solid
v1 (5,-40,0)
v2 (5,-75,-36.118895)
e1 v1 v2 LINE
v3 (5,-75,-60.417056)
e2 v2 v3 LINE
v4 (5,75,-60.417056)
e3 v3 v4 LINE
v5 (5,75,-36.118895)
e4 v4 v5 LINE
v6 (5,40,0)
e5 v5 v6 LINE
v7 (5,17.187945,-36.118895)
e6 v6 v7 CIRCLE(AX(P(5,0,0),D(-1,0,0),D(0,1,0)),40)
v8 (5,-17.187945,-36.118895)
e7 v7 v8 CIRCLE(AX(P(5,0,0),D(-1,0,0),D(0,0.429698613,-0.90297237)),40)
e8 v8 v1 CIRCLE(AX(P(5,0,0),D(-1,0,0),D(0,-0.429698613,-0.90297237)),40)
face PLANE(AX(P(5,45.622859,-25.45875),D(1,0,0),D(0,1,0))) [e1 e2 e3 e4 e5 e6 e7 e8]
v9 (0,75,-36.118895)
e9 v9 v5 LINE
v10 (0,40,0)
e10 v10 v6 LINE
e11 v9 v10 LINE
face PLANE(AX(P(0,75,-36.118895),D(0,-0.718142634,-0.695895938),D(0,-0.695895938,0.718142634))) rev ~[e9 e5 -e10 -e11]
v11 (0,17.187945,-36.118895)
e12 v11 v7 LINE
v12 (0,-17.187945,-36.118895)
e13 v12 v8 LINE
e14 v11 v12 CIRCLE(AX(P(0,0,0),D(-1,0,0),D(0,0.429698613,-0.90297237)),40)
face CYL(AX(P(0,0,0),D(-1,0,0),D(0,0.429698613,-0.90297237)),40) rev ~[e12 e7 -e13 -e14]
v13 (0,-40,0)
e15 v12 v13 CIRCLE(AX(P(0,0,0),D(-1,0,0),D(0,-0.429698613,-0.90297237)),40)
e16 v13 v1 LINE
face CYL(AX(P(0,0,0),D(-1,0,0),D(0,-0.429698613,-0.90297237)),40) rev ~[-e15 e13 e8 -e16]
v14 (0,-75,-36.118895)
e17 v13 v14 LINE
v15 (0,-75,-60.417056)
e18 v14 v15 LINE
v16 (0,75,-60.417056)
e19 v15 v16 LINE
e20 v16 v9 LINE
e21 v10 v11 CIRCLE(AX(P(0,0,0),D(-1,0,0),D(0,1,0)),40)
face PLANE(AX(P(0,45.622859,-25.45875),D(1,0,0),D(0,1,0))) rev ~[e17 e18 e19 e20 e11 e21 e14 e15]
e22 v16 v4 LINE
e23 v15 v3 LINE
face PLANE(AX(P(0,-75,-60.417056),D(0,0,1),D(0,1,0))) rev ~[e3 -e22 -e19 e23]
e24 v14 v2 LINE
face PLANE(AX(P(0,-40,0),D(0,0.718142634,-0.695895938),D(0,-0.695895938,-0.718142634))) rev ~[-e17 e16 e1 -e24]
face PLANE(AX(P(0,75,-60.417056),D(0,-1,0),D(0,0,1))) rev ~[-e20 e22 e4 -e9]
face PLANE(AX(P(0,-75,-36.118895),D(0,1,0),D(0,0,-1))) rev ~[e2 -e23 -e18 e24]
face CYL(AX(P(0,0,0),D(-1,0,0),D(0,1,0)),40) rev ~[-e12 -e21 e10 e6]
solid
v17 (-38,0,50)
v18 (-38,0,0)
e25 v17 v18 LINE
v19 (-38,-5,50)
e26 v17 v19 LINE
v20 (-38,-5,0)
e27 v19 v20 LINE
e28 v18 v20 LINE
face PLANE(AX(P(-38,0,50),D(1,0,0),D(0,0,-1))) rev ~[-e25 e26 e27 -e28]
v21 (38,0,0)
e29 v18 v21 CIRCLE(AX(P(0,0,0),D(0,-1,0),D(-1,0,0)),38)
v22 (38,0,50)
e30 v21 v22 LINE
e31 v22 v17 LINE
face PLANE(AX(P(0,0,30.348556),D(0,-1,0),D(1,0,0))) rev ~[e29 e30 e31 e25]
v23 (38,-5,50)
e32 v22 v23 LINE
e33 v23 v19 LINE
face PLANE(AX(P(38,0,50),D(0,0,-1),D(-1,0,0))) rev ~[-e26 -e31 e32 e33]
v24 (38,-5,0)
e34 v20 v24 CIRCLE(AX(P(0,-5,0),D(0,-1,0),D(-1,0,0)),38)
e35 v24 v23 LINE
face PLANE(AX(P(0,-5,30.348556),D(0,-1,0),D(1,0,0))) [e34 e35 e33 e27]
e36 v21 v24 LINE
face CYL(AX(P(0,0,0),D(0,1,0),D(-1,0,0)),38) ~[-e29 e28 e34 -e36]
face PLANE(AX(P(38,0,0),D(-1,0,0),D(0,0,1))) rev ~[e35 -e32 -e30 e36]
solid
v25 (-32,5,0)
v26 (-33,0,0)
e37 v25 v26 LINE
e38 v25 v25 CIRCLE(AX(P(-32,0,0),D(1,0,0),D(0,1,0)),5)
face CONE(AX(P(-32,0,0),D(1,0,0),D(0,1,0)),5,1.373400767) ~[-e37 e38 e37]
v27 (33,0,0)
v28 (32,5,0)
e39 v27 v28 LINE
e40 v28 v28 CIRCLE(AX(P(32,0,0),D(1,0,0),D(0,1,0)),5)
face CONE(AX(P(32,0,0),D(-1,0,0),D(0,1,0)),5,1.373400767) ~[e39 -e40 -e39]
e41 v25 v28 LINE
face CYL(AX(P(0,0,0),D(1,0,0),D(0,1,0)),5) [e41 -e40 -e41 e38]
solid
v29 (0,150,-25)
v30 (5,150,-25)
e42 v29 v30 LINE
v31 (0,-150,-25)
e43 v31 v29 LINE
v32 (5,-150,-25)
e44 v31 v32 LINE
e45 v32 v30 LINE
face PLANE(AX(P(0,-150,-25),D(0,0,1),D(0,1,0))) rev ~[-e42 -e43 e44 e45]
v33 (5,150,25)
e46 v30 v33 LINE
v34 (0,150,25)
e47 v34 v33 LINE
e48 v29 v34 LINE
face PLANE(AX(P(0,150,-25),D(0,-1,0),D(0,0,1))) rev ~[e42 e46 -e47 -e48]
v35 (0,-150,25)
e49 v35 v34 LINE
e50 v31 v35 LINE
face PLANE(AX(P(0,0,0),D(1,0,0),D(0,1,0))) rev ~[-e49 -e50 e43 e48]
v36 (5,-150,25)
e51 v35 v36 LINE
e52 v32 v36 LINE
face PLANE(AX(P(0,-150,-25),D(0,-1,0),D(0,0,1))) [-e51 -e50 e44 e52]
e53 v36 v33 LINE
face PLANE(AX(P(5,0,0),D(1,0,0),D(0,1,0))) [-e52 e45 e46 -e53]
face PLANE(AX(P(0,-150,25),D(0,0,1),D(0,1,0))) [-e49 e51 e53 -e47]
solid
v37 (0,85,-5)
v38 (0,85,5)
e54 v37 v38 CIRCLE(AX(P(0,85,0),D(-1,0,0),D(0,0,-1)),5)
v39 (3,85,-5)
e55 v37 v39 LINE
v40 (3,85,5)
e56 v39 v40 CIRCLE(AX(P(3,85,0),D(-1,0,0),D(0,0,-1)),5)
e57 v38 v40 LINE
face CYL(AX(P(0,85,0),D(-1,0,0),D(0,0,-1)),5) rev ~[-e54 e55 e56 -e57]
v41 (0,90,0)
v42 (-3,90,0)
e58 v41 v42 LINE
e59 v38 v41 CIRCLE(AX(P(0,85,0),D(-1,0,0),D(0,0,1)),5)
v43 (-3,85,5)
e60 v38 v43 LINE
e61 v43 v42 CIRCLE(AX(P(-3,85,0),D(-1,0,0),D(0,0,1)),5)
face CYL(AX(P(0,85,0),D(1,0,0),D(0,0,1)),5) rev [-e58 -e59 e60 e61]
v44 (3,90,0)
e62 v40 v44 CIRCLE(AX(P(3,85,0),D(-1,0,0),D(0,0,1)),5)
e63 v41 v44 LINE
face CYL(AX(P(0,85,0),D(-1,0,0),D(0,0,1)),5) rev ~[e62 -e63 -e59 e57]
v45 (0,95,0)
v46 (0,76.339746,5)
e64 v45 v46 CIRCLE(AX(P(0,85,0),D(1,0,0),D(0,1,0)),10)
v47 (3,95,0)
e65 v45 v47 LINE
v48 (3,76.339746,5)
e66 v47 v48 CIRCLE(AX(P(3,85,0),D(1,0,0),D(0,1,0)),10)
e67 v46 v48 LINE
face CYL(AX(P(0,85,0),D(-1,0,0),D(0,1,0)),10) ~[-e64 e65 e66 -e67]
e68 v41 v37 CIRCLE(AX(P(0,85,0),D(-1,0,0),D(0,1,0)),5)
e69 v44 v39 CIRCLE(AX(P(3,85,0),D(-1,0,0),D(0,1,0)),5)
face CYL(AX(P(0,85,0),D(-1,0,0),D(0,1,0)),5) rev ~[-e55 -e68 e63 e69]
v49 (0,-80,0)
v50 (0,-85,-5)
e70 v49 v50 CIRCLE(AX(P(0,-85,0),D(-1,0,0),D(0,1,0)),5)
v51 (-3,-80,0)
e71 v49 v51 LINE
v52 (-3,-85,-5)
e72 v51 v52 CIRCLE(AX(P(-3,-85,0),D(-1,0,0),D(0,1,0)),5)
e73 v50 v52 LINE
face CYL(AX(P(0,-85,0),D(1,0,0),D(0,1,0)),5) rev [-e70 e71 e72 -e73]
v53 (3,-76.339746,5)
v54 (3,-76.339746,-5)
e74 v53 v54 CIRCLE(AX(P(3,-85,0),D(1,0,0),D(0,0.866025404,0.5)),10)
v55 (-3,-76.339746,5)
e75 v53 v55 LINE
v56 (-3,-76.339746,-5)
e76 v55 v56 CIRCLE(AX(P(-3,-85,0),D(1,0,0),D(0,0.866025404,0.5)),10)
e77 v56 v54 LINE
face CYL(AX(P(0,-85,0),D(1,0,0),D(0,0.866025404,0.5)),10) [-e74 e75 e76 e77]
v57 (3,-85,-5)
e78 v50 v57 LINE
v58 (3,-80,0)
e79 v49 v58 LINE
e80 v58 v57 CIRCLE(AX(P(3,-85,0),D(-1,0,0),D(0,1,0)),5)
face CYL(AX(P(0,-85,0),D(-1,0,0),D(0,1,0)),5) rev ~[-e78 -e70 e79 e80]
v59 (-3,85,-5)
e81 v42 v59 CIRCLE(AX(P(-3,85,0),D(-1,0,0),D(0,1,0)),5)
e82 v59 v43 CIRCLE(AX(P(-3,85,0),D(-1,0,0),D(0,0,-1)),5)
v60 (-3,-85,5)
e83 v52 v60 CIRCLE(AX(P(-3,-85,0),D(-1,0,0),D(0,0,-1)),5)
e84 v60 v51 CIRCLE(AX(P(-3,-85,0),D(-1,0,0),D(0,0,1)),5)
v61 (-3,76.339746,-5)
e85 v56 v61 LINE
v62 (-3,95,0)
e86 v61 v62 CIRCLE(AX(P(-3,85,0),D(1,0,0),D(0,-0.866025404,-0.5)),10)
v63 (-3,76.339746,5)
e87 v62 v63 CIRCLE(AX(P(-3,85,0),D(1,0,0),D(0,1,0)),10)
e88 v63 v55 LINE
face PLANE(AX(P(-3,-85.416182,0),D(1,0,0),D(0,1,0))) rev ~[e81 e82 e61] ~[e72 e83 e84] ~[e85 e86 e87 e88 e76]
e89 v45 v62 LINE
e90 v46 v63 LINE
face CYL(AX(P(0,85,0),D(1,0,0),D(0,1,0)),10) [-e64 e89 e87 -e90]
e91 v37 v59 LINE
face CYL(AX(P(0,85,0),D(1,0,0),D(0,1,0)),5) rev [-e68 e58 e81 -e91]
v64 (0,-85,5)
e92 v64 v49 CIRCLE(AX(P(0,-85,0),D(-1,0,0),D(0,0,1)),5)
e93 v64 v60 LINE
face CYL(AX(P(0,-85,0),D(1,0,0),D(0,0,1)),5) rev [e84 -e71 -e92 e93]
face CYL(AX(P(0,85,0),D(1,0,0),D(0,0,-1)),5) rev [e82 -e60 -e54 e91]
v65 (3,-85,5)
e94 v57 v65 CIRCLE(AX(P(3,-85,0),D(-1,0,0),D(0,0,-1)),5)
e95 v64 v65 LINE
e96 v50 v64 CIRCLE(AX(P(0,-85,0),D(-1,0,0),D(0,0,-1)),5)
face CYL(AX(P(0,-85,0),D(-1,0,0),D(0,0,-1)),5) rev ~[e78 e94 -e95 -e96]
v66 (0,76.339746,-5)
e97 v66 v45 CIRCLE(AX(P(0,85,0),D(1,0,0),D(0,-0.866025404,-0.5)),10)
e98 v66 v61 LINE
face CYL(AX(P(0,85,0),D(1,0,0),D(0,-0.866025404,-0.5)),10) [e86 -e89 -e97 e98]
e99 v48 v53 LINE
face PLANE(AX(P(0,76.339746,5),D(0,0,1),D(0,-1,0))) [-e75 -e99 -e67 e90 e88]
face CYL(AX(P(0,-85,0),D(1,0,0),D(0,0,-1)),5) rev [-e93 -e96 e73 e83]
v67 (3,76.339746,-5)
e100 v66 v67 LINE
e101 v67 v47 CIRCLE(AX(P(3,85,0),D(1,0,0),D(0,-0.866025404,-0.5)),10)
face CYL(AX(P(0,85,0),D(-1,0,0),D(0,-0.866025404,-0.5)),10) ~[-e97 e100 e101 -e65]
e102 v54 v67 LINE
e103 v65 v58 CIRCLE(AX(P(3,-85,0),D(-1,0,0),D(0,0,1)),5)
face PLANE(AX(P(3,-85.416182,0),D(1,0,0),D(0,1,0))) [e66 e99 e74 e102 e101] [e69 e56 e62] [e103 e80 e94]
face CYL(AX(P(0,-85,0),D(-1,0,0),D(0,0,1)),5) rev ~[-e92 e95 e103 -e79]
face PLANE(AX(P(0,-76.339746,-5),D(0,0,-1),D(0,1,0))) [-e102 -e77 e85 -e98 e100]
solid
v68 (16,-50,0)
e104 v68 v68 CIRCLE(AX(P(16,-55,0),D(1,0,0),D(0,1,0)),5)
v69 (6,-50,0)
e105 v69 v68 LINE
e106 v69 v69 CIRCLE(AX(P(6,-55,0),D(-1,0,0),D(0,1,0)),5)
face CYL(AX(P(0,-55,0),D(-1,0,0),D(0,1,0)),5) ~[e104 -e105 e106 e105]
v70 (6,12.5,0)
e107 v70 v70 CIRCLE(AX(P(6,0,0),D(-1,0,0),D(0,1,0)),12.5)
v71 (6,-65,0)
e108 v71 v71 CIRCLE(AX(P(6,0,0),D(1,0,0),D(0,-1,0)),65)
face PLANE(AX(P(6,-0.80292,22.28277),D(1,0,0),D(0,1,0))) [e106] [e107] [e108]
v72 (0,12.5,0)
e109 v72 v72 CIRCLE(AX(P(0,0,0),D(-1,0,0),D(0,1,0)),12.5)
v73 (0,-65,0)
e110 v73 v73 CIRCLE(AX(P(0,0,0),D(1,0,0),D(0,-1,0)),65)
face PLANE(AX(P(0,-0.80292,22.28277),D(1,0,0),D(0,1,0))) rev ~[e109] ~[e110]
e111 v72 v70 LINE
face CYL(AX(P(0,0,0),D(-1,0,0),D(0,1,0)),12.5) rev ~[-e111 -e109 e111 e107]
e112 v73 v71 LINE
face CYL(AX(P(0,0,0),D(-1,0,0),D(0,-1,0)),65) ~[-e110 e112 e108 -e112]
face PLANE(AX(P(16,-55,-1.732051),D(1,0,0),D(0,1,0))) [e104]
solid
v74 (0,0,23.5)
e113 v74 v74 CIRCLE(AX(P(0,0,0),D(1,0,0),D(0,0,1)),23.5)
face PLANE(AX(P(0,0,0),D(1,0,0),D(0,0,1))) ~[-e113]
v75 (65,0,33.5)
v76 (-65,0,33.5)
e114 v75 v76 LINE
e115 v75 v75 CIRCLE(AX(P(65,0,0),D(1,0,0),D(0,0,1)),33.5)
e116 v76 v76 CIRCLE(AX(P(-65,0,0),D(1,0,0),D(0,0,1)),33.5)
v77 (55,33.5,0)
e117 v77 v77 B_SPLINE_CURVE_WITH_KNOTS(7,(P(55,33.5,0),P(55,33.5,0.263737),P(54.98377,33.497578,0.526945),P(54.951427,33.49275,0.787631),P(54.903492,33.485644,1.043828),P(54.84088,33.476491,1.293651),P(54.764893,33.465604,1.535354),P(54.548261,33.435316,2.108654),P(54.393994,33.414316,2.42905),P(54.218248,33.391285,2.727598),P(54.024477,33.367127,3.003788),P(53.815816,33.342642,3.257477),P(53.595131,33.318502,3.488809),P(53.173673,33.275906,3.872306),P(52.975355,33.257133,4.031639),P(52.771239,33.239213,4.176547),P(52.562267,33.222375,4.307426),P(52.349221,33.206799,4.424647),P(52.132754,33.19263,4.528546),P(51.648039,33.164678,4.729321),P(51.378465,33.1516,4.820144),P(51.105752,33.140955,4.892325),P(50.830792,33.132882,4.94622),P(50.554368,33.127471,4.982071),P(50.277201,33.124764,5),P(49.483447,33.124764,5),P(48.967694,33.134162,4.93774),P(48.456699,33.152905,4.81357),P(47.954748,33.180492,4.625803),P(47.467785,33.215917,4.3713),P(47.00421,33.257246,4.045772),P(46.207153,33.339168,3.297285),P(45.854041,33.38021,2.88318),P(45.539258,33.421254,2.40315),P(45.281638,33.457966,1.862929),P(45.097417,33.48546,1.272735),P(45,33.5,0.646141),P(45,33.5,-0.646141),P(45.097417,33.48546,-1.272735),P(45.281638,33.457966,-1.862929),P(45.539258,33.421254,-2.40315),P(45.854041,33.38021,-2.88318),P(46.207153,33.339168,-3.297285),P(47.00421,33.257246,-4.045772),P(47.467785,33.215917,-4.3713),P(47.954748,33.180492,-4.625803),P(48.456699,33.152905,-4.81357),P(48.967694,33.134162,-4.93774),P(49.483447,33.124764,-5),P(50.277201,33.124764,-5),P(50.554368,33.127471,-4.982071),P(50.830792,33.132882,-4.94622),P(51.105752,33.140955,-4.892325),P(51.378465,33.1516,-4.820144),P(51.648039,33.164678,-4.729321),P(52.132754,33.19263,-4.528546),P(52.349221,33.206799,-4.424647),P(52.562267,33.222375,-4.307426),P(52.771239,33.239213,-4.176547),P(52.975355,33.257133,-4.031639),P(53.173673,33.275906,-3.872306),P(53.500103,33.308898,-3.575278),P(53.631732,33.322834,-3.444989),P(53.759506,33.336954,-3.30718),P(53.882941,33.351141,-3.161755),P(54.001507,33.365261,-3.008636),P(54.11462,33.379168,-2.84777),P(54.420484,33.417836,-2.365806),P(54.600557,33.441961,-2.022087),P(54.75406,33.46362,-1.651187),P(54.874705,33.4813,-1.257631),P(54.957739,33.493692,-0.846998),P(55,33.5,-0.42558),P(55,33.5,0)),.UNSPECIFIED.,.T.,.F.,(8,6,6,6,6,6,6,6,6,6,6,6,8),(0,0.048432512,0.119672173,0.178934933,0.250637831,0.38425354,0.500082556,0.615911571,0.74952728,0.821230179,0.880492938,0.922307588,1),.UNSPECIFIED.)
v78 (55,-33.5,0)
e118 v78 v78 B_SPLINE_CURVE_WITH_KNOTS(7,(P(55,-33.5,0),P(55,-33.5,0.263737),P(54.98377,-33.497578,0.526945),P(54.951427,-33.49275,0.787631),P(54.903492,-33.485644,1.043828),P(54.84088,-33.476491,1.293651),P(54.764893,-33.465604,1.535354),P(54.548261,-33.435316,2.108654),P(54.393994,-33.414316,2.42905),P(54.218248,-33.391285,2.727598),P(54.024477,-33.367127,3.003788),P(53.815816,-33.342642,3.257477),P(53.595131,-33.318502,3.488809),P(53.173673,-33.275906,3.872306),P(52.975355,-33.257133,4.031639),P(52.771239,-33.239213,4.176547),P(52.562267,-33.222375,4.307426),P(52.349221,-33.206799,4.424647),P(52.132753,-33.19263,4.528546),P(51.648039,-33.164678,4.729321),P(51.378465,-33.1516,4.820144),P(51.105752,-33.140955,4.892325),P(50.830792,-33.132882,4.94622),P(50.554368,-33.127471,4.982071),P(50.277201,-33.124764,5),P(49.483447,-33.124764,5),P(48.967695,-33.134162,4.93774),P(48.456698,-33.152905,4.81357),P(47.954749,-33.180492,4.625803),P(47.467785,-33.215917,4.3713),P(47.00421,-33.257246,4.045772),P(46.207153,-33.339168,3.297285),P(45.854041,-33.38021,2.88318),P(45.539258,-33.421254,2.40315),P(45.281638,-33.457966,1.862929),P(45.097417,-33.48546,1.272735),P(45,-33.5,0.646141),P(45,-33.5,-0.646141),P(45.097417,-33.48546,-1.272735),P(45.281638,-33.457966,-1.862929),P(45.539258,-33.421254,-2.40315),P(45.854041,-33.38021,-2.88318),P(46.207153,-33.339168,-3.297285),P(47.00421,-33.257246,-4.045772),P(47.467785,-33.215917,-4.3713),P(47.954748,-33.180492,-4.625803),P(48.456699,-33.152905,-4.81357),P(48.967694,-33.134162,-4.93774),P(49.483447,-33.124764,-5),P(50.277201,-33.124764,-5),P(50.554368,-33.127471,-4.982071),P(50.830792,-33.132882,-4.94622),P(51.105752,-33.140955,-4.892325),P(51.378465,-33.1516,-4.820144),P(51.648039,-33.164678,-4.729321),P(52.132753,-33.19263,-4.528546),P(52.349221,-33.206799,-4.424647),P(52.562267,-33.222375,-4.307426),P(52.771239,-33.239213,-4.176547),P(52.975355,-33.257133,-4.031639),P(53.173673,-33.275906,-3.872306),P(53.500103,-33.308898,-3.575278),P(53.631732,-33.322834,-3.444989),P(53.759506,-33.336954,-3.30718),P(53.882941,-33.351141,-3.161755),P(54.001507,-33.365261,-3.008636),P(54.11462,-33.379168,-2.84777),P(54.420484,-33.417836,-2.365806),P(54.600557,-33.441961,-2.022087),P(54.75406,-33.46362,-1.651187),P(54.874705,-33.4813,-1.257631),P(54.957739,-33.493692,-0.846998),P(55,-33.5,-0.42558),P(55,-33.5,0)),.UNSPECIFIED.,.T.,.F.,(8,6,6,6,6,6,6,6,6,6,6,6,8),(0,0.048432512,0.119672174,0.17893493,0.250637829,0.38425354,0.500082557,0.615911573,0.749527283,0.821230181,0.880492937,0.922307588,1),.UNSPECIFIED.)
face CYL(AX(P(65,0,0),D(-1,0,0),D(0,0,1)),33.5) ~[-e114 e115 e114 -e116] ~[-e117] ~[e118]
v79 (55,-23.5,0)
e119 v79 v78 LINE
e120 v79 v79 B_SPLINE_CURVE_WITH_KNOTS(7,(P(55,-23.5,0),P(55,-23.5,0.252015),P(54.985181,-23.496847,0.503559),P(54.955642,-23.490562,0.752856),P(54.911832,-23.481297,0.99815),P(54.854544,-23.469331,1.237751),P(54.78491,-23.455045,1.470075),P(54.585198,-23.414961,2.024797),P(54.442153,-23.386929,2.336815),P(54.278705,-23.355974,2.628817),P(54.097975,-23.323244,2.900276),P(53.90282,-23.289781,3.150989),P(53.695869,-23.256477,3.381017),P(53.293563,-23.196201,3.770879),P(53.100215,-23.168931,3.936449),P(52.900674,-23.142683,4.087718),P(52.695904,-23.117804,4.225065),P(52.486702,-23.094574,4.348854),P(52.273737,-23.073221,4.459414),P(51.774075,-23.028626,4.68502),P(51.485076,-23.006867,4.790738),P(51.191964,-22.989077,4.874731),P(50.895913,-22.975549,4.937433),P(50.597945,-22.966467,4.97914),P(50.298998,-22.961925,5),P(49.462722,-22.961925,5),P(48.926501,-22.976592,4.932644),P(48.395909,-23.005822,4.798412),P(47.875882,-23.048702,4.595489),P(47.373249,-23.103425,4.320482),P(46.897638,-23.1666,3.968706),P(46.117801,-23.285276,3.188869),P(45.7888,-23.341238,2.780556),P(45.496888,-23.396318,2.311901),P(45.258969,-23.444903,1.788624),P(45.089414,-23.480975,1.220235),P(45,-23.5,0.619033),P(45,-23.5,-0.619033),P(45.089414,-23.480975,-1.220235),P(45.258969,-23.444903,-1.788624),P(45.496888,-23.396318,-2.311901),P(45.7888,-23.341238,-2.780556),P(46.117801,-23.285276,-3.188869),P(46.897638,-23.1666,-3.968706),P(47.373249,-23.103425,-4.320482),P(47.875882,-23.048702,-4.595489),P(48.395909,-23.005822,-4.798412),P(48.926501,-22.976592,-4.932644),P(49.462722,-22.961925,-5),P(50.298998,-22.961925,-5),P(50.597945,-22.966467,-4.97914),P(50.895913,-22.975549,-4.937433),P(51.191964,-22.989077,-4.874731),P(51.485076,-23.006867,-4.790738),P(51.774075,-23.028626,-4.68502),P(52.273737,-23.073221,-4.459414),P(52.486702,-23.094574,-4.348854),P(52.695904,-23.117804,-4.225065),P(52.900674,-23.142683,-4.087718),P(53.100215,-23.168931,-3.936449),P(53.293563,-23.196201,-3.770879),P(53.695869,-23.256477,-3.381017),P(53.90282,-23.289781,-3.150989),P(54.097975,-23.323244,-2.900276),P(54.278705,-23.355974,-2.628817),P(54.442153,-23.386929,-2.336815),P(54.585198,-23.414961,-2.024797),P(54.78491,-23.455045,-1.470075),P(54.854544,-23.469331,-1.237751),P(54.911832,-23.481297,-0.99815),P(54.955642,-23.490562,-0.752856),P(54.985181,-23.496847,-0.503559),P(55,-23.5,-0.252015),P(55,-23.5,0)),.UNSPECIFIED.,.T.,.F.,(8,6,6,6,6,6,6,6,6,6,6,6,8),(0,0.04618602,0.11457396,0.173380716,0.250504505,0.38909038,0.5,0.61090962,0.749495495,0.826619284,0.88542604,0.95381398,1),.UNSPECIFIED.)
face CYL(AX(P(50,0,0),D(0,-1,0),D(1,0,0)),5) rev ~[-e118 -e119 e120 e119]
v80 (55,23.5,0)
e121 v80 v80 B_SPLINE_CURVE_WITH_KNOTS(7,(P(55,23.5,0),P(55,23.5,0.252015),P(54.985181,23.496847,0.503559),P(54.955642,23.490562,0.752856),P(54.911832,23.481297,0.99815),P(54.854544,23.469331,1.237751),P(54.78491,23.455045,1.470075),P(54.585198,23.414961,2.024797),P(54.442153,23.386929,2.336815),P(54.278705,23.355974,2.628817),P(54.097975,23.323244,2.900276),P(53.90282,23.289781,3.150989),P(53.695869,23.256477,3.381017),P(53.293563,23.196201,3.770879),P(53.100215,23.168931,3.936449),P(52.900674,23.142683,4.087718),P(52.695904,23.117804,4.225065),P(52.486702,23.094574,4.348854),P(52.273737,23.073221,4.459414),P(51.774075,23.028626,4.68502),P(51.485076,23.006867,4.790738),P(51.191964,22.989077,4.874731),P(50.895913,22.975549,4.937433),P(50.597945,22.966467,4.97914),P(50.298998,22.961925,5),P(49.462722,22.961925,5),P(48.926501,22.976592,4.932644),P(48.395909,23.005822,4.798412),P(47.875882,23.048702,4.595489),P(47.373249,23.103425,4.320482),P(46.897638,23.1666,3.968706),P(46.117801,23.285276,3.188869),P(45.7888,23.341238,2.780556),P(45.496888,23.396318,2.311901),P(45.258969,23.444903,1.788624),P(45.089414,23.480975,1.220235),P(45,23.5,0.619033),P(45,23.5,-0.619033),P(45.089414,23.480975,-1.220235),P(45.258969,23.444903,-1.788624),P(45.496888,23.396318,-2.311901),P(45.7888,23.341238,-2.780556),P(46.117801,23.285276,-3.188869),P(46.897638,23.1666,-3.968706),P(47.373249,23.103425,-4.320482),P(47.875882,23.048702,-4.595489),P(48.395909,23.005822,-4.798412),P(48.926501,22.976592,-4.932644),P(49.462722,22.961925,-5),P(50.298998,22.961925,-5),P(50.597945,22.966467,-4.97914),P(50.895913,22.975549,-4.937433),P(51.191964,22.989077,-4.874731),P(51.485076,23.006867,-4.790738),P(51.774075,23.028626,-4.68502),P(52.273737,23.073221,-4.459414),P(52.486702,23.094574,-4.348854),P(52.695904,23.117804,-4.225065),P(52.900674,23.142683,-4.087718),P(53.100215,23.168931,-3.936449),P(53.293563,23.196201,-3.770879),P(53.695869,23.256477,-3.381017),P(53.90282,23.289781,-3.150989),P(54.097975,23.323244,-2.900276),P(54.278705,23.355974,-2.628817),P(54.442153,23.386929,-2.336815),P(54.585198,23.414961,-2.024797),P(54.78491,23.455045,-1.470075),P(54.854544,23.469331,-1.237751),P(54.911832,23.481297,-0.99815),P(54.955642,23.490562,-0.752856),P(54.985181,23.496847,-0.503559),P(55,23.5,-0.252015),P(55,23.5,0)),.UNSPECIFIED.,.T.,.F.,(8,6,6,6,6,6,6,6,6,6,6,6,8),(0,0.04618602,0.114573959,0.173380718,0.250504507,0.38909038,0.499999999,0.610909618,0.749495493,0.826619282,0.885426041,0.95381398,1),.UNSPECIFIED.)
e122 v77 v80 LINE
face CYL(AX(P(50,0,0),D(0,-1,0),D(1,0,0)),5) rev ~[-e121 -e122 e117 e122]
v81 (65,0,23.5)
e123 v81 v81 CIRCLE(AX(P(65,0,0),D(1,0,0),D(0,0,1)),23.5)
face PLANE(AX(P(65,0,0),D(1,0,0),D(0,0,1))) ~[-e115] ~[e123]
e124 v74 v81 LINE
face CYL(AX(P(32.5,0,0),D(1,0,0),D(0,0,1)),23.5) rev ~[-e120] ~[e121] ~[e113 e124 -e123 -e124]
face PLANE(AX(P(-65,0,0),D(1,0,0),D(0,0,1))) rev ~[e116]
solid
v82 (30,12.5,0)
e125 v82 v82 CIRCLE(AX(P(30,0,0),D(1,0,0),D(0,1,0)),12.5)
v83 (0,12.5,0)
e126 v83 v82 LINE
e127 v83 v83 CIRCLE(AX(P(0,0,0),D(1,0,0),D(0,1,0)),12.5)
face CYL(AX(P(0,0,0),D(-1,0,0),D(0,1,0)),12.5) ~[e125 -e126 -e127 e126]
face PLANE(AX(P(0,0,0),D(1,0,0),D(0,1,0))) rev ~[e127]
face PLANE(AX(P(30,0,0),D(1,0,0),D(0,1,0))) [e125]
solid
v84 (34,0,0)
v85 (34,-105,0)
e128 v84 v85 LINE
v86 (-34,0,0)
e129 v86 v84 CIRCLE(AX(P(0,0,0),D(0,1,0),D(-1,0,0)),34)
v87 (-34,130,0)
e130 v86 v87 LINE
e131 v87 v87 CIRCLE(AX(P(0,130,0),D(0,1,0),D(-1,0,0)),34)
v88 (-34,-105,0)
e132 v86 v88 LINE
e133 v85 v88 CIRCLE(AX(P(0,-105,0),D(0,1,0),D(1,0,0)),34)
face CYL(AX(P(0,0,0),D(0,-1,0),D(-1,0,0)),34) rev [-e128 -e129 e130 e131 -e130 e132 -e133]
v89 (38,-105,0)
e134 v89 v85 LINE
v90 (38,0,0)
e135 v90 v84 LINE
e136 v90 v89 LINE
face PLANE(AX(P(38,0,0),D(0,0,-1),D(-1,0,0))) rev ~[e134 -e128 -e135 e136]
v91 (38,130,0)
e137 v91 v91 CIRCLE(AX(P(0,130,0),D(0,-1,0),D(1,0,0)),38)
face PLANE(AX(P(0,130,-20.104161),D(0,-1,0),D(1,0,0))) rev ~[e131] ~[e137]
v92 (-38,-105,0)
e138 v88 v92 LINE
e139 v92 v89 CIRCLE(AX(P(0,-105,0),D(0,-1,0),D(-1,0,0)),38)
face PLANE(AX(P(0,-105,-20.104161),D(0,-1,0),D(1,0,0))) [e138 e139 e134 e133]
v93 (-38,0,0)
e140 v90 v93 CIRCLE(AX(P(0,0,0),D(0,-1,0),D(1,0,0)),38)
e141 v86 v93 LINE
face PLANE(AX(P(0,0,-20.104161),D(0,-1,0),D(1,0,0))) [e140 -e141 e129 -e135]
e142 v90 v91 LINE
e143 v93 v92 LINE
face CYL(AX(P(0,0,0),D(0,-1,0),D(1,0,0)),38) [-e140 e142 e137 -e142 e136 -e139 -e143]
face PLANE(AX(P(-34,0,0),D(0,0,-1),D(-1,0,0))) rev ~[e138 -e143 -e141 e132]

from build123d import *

# Parameters (mm, degrees)
F1_DEPTH  = 105
F2_DEPTH  = 130
F4_DEPTH  = 5
F5_W      = 65
F5_H      = 10
F7_DEPTH  = 34
F9_DEPTH  = 6
F10_DEPTH = 16
F11_R     = 5
F12_DEPTH = 33
F13_SIZE2 = 1
F13_SIZE  = 5
F14_SIZE2 = 5
F14_SIZE  = 1
F16_DEPTH = 3
F17_R     = 12.5
F18_DEPTH = 30
F19_W     = 300
F19_H     = 50
F20_DEPTH = 5
F22_DEPTH = 5


# Not quite as in the source:
# - a feature names something its author has since deleted; it is built from what else it names


with BuildPart() as f1:
    # F0 (on Front) → F1 (new body)
    with BuildSketch(Plane.XZ):
        with BuildLine():
            Line((38, 0), (34, 0))
            ThreePointArc((34, 0), (0, -34), (-34, 0))
            Line((-34, 0), (-38, 0))
            ThreePointArc((-38, 0), (0, -38), (38, 0))
        make_face()
    extrude(amount=F1_DEPTH)

    # F0 (on Front) → F2 (join)
    with BuildSketch(Plane.XZ):
        with BuildLine():
            Line((38, 0), (34, 0))
            ThreePointArc((34, 0), (0, -34), (-34, 0))
            Line((-34, 0), (-38, 0))
            ThreePointArc((-38, 0), (0, -38), (38, 0))
        make_face()
        with BuildLine():
            ThreePointArc((-34, 0), (0, 34), (34, 0))
            Line((34, 0), (38, 0))
            ThreePointArc((38, 0), (0, 38), (-38, 0))
            Line((-38, 0), (-34, 0))
        make_face()
    extrude(amount=-F2_DEPTH)


with BuildPart() as f4:
    # F3 (on Front) → F4 (new body)
    with BuildSketch(Plane.XZ):
        with BuildLine():
            ThreePointArc((-38, 0), (0, 38), (38, 0))
            Line((38, 0), (38, 50))
            Line((38, 50), (-38, 50))
            Line((-38, 50), (-38, 0))
        make_face()
        with BuildLine():
            ThreePointArc((-38, 0), (0, -38), (38, 0))
            Line((38, 0), (-38, 0))
        make_face()
        with BuildLine():
            Line((-38, 0), (38, 0))
            ThreePointArc((38, 0), (0, 38), (-38, 0))
        make_face()
    extrude(amount=F4_DEPTH)


with BuildPart() as f6:
    # F5 (on Front) → F6 (revolve)
    with BuildSketch(Plane.XZ):
        with Locations((32.5, 28.5)):
            Rectangle(F5_W, F5_H)
        Polygon((0, 23.5), (0, 33.5), (-65, 33.5), (-65, 0), (0, 0), align=None)
    revolve(axis=Axis((0, 0, 0), (1, 0, 0)))

    # F5 (on Front) → F7 (cut, symmetric)
    with BuildSketch(Plane.XZ):
        with BuildLine():
            ThreePointArc((45, 0), (50, -5), (55, 0))
            Line((55, 0), (45, 0))
        make_face()
        with BuildLine():
            Line((45, 0), (55, 0))
            ThreePointArc((55, 0), (50, 5), (45, 0))
        make_face()
    extrude(amount=F7_DEPTH, both=True, mode=Mode.SUBTRACT)


with BuildPart() as f9:
    # F8 (on Right) → F9 (new body)
    with BuildSketch(Plane.YZ):
        with BuildLine():
            Line((12.5, 0), (65, 0))
            ThreePointArc((65, 0), (0, 65), (-65, 0))
            Line((-65, 0), (-60, 0))
            ThreePointArc((-60, 0), (-55, 5), (-50, 0))
            Line((-50, 0), (-12.5, 0))
            ThreePointArc((-12.5, 0), (0, 12.5), (12.5, 0))
        make_face()
        with BuildLine():
            ThreePointArc((-65, 0), (0, -65), (65, 0))
            Line((65, 0), (12.5, 0))
            ThreePointArc((12.5, 0), (0, -12.5), (-12.5, 0))
            Line((-12.5, 0), (-50, 0))
            ThreePointArc((-50, 0), (-55, -5), (-60, 0))
            Line((-60, 0), (-65, 0))
        make_face()
    extrude(amount=F9_DEPTH)

    # F8 (on Right) → F10 (join)
    with BuildSketch(Plane.YZ):
        with BuildLine():
            Line((-50, 0), (-60, 0))
            ThreePointArc((-60, 0), (-55, -5), (-50, 0))
        make_face()
        with BuildLine():
            ThreePointArc((-50, 0), (-55, 5), (-60, 0))
            Line((-60, 0), (-50, 0))
        make_face()
    extrude(amount=F10_DEPTH)


with BuildPart() as f12:
    # F11 (on Right) → F12 (new body, symmetric)
    with BuildSketch(Plane.YZ):
        Circle(F11_R)
    extrude(amount=F12_DEPTH, both=True)

    # F13
    f13_edges = [f12.edges().sort_by_distance(p)[0] for p in [
        (33, -5, 0),
    ]]
    f13_side = f12.faces().sort_by_distance((33, 0, 0))[0]
    chamfer(f13_edges, length=F13_SIZE, length2=F13_SIZE2, reference=f13_side)

    # F14
    f14_edges = [f12.edges().sort_by_distance(p)[0] for p in [
        (-33, -5, 0),
    ]]
    chamfer(f14_edges, length=F14_SIZE, length2=F14_SIZE2)


with BuildPart() as f16:
    # F15 (on Right) → F16 (new body, symmetric)
    with BuildSketch(Plane.YZ):
        with BuildLine():
            Line((-85, 5), (-76.3397459622, 5))
            ThreePointArc((-76.3397459622, 5), (-95, 0), (-76.3397459622, -5))
            Line((-76.3397459622, -5), (-85, -5))
            ThreePointArc((-85, -5), (-90, 0), (-85, 5))
        make_face()
        with BuildLine():
            ThreePointArc((-75, 0), (-75.3407417371, 2.588190451), (-76.3397459622, 5))
            Line((-76.3397459622, 5), (-85, 5))
            ThreePointArc((-85, 5), (-81.4644660941, 3.5355339059), (-80, 0))
            ThreePointArc((-80, 0), (-81.4644660941, -3.5355339059), (-85, -5))
            Line((-85, -5), (-76.3397459622, -5))
            ThreePointArc((-76.3397459622, -5), (-75.3407417371, -2.588190451), (-75, 0))
        make_face()
        with BuildLine():
            ThreePointArc((76.3397459622, -5), (75, 0), (76.3397459622, 5))
            Line((76.3397459622, 5), (-76.3397459622, 5))
            ThreePointArc((-76.3397459622, 5), (-75.3407417371, 2.588190451), (-75, 0))
            ThreePointArc((-75, 0), (-75.3407417371, -2.588190451), (-76.3397459622, -5))
            Line((-76.3397459622, -5), (76.3397459622, -5))
        make_face()
        with BuildLine():
            ThreePointArc((85, -5), (80, 0), (85, 5))
            Line((85, 5), (76.3397459622, 5))
            ThreePointArc((76.3397459622, 5), (75, 0), (76.3397459622, -5))
            Line((76.3397459622, -5), (85, -5))
        make_face()
        with BuildLine():
            Line((76.3397459622, 5), (85, 5))
            ThreePointArc((85, 5), (88.5355339059, 3.5355339059), (90, 0))
            ThreePointArc((90, 0), (88.5355339059, -3.5355339059), (85, -5))
            Line((85, -5), (76.3397459622, -5))
            ThreePointArc((76.3397459622, -5), (87.588190451, -9.6592582629), (95, 0))
            ThreePointArc((95, 0), (87.588190451, 9.6592582629), (76.3397459622, 5))
        make_face()
    extrude(amount=F16_DEPTH, both=True)


with BuildPart() as f18:
    # F17 (on Right) → F18 (new body)
    with BuildSketch(Plane.YZ):
        Circle(F17_R)
    extrude(amount=F18_DEPTH)


with BuildPart() as f20:
    # F19 (on Right) → F20 (new body)
    with BuildSketch(Plane.YZ):
        Rectangle(F19_W, F19_H)
    extrude(amount=F20_DEPTH)


with BuildPart() as f22:
    # F21 (on Right) → F22 (new body)
    with BuildSketch(Plane.YZ):
        with BuildLine():
            Line((75, -36.1188948154), (40, 0))
            ThreePointArc((40, 0), (33.8195045896, -21.3598012471), (17.1879445342, -36.1188948154))
            Line((17.1879445342, -36.1188948154), (75, -36.1188948154))
        make_face()
        with BuildLine():
            Line((75, -36.1188948154), (17.1879445342, -36.1188948154))
            ThreePointArc((17.1879445342, -36.1188948154), (0, -40), (-17.1879445342, -36.1188948154))
            Line((-17.1879445342, -36.1188948154), (-75, -36.1188948154))
            Line((-75, -36.1188948154), (-75, -60.4170560837))
            Line((-75, -60.4170560837), (75, -60.4170560837))
            Line((75, -60.4170560837), (75, -36.1188948154))
        make_face()
        with BuildLine():
            ThreePointArc((-17.1879445342, -36.1188948154), (-33.8195045896, -21.3598012471), (-40, 0))
            Line((-40, 0), (-75, -36.1188948154))
            Line((-75, -36.1188948154), (-17.1879445342, -36.1188948154))
        make_face()
    extrude(amount=F22_DEPTH)


solid = Compound([f1.part, f4.part, f6.part, f9.part, f12.part, f16.part, f18.part, f20.part, f22.part])
